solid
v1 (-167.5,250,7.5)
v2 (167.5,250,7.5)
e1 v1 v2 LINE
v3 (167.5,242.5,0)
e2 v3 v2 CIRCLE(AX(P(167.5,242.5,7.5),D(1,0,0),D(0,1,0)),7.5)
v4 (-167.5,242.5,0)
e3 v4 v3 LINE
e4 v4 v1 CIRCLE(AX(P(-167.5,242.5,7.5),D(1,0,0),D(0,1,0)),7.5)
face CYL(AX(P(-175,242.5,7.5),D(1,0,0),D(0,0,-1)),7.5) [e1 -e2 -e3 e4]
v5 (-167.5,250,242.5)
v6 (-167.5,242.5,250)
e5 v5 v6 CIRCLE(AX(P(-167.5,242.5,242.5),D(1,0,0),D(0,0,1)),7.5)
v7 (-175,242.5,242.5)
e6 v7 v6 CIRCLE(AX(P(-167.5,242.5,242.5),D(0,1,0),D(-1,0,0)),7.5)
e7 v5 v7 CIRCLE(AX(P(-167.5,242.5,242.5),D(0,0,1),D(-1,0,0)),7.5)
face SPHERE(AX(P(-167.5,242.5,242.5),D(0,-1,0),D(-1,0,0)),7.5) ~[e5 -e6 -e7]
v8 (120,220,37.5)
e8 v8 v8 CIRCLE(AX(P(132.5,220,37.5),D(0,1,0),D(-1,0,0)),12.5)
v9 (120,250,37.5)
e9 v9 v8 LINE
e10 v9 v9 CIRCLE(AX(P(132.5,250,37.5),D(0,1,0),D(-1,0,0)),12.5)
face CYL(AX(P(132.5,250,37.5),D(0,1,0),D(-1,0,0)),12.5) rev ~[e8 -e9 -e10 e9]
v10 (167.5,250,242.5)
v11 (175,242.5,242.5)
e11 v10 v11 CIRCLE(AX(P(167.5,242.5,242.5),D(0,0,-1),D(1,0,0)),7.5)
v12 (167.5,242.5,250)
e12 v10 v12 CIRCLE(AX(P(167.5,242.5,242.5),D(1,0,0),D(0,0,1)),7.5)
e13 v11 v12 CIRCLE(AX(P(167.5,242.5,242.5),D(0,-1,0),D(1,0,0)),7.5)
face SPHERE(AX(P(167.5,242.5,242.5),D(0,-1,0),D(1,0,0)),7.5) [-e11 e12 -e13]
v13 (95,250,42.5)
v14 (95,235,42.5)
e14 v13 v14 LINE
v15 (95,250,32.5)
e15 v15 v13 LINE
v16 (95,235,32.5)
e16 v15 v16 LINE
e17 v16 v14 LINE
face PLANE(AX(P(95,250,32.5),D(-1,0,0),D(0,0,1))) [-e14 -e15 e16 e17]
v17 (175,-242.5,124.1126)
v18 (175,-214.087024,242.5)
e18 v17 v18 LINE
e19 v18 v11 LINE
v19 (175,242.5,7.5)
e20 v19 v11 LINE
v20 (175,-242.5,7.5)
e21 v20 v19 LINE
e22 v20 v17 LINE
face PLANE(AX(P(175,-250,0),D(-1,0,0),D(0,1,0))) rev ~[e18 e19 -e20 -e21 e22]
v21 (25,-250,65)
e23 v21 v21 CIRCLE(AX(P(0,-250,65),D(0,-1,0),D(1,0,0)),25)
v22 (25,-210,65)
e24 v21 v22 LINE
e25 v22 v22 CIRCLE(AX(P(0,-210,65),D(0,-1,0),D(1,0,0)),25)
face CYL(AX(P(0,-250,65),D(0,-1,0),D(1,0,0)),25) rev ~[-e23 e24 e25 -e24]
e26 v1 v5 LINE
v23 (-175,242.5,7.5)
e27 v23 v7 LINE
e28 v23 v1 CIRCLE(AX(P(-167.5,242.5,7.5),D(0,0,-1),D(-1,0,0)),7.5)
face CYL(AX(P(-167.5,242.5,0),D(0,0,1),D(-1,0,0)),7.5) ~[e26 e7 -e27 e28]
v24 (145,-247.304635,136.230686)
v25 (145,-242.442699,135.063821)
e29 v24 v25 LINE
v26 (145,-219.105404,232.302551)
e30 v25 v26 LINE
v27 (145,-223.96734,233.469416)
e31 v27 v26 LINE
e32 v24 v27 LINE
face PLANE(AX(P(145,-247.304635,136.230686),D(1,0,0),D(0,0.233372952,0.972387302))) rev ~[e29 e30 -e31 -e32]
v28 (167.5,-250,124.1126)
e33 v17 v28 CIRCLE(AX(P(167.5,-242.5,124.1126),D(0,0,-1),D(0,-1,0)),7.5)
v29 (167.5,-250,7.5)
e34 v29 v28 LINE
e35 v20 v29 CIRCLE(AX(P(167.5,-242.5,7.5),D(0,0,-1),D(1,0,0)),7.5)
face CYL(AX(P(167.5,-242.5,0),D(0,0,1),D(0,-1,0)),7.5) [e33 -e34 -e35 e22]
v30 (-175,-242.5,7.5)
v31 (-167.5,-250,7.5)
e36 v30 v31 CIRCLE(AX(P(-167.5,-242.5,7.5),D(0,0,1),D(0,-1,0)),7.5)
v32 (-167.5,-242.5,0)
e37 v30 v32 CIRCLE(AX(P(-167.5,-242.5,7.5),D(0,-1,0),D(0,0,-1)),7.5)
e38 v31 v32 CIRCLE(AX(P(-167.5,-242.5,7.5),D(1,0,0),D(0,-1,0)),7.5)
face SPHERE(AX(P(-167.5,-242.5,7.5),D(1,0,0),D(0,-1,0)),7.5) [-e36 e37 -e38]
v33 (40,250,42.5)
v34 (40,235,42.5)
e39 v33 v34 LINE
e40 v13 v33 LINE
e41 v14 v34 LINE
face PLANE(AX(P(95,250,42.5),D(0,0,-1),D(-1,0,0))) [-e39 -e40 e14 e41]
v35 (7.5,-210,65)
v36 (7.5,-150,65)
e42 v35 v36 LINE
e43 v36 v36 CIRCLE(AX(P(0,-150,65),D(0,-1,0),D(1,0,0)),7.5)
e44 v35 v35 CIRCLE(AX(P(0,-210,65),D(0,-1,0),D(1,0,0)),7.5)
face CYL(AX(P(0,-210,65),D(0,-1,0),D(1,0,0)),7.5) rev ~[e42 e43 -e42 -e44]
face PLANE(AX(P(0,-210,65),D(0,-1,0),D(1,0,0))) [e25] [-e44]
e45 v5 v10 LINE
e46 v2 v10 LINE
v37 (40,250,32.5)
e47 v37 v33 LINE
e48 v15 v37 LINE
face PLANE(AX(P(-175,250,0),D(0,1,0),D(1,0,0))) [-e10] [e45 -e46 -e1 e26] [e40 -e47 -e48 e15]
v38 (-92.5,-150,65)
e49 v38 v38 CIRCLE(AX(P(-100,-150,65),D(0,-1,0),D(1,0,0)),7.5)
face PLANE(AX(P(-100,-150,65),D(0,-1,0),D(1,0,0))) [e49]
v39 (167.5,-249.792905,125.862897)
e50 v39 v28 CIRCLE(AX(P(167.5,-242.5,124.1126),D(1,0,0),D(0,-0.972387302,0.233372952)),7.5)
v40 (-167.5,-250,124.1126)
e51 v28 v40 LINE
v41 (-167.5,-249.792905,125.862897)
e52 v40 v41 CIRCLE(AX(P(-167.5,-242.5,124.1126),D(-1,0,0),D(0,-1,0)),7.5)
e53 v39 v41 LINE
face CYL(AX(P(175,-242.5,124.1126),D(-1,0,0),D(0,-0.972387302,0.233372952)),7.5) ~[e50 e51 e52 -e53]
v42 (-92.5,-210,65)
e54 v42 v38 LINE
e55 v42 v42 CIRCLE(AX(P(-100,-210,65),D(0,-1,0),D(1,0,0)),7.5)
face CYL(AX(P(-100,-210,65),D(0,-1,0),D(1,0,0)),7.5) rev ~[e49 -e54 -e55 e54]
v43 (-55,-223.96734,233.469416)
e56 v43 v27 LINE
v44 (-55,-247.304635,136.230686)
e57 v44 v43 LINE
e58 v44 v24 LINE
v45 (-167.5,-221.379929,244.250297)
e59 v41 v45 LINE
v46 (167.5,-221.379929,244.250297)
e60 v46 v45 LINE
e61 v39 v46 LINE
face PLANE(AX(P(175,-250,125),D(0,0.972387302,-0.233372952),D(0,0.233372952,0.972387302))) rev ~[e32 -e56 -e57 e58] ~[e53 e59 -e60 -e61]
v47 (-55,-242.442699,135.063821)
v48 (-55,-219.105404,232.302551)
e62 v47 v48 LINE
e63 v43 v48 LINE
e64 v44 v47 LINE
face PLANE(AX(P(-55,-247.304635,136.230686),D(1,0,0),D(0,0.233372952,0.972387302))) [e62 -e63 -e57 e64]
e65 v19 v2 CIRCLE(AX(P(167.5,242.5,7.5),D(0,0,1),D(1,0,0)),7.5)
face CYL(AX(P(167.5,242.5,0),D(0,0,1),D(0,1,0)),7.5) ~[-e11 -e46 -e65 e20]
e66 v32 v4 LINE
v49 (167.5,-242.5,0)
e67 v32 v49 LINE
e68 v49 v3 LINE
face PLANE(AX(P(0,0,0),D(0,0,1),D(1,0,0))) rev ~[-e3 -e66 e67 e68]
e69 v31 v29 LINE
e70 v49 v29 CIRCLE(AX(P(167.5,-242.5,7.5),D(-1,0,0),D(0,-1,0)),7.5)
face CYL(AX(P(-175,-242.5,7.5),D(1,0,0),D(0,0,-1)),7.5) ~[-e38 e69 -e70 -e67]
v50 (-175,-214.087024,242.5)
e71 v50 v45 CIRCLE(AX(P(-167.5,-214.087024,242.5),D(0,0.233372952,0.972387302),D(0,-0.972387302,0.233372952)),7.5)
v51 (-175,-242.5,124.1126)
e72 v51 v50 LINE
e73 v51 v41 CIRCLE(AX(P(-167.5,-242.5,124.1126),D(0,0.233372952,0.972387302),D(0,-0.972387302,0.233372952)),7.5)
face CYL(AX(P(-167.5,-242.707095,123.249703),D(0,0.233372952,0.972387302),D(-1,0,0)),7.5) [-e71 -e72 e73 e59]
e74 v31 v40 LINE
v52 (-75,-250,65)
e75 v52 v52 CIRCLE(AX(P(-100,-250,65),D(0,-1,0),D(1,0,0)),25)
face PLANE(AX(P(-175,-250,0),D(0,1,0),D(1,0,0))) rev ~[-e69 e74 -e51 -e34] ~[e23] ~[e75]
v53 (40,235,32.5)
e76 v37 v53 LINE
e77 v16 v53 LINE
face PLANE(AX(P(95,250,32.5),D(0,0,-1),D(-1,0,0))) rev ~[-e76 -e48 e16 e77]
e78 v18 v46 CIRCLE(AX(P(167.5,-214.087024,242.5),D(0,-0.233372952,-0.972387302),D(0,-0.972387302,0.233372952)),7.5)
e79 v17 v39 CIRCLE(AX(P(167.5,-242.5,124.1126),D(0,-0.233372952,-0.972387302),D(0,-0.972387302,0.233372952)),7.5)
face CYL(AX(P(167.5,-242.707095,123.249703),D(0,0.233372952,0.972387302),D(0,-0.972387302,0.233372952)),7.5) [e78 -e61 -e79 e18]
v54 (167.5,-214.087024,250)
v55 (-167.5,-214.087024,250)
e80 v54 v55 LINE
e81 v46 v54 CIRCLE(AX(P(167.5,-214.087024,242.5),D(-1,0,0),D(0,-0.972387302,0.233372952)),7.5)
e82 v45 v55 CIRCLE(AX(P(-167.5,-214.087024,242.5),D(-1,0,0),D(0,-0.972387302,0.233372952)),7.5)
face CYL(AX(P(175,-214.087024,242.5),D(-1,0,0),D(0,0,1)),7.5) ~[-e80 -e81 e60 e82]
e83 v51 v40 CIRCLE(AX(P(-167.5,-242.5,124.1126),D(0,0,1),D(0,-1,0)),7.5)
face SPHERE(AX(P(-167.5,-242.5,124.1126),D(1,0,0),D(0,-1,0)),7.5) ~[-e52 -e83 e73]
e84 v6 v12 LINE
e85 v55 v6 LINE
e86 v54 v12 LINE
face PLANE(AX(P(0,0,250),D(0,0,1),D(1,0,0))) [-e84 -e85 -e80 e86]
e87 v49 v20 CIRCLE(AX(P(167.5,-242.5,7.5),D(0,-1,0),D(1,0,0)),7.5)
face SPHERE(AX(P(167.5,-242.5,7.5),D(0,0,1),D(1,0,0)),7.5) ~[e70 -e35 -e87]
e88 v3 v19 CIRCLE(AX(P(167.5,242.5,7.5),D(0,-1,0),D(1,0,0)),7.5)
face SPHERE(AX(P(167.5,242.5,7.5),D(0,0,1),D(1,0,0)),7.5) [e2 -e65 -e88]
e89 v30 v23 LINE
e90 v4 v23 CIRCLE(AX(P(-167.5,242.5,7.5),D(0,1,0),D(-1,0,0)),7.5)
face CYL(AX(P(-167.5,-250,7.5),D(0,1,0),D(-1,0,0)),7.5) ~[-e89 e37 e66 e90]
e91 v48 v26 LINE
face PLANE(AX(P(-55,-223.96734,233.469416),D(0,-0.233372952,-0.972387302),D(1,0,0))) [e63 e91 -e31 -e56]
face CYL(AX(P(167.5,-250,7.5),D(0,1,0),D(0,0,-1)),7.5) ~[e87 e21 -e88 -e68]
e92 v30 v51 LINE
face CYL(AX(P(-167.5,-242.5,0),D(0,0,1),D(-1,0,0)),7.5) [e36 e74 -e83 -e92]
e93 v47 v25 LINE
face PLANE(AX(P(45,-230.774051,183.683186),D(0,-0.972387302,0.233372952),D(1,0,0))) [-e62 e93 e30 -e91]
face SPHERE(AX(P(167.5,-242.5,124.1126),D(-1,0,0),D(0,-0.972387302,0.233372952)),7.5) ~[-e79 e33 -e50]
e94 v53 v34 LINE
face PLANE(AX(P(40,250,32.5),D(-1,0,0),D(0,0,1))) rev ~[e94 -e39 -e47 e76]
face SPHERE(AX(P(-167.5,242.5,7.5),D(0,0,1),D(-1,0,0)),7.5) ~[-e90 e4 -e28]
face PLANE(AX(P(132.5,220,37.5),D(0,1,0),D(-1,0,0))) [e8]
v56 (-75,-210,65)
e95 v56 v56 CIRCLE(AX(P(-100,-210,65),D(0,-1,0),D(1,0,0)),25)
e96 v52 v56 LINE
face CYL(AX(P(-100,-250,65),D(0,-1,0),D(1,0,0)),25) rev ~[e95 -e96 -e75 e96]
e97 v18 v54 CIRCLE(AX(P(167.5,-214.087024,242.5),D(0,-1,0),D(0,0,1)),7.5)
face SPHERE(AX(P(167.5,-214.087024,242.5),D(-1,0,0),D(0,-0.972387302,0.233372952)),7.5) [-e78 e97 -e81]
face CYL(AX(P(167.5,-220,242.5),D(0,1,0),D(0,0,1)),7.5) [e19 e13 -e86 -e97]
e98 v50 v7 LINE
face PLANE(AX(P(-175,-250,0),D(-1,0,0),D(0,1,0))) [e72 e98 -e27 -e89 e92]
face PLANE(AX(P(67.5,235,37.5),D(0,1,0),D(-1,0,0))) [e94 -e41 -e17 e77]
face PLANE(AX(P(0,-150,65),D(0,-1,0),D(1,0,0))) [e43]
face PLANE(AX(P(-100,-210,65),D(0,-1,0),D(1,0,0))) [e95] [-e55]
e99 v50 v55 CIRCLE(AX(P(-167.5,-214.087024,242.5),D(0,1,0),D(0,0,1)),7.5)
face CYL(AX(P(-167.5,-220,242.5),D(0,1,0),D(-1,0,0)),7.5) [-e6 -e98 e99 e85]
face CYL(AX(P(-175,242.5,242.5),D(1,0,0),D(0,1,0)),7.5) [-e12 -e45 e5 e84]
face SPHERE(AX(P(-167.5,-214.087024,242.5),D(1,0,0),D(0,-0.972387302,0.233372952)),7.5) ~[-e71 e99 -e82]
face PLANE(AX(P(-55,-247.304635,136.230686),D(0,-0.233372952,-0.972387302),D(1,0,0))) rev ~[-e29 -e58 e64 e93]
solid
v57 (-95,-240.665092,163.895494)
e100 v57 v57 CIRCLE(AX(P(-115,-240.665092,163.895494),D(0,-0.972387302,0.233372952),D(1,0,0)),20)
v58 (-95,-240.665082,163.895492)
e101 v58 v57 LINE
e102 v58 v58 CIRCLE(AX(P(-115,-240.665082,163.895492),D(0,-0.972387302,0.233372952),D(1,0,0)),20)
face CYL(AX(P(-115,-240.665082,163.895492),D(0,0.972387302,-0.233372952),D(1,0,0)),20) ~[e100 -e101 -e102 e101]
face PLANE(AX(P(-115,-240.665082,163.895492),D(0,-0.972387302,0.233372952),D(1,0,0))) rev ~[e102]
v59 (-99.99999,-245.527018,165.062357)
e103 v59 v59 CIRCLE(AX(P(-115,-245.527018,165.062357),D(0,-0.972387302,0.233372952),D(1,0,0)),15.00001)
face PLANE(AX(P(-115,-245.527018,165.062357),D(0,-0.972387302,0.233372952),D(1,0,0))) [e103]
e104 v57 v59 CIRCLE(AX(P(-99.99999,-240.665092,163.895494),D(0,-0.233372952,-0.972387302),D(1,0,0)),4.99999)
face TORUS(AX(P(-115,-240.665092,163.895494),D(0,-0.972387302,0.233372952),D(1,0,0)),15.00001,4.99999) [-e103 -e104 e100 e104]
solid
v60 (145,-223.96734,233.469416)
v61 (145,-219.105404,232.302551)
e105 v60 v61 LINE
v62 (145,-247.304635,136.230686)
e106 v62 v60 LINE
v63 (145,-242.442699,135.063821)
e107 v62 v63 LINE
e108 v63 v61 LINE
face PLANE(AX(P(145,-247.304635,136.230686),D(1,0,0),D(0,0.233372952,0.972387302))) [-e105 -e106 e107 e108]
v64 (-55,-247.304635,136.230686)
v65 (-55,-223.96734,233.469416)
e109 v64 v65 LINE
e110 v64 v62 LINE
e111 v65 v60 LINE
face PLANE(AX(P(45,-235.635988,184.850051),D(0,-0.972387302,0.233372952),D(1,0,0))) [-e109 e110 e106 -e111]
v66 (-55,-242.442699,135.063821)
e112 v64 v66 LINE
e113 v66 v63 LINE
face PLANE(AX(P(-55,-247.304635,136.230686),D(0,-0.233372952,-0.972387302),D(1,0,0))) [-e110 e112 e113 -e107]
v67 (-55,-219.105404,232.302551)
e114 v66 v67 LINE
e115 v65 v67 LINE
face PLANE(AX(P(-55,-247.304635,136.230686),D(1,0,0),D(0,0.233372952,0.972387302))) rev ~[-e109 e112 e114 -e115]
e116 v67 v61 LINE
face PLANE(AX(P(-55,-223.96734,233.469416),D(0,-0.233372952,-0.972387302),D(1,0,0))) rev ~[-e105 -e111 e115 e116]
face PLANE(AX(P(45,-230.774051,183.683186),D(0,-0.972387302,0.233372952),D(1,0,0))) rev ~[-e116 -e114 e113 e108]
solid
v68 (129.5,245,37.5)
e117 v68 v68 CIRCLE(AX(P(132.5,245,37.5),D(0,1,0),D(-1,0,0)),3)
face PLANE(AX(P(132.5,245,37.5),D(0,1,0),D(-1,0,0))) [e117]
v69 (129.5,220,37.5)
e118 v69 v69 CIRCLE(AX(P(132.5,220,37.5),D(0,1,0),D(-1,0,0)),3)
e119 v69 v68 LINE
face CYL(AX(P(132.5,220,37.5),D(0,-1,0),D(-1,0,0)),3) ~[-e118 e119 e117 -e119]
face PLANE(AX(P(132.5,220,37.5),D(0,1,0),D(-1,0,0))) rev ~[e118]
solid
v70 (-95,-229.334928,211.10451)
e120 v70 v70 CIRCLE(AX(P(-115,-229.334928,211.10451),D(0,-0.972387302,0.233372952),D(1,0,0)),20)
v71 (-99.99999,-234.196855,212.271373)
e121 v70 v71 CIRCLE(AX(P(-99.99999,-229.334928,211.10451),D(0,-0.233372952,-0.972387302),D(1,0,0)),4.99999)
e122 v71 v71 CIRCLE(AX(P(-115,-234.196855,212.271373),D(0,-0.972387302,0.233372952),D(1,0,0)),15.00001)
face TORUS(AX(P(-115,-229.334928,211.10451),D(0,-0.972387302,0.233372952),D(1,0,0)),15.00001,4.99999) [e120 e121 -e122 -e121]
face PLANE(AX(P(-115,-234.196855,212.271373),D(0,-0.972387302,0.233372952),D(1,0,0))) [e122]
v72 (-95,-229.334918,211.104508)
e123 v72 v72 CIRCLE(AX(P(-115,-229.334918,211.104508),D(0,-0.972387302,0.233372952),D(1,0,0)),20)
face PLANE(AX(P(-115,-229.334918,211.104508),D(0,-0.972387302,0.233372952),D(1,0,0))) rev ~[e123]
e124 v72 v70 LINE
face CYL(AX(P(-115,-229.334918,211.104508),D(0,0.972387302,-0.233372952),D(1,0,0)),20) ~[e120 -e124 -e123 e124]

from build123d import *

# Parameters (mm, degrees)
F0_W      = 350
F0_H      = 500
F1_DEPTH  = 250
F3_DEPTH  = 350
F4_R      = 20
F5_DEPTH  = 5
F6_R      = 4.99999
F7_R      = 20
F8_DEPTH  = 5
F9_R      = 4.99999
F10_W     = 200
F10_H     = 100
F11_DEPTH = 5
F12_W     = 200
F12_H     = 100
F13_DEPTH = 5
F14_R     = 25
F15_DEPTH = 40
F16_R     = 7.5
F17_DEPTH = 60
F18_R     = 25
F19_DEPTH = 40
F20_R     = 7.5
F21_DEPTH = 60
F22_R     = 7.5
F23_R     = 12.5
F24_DEPTH = 30
F25_R     = 3
F26_DEPTH = 25
F27_W     = 55
F27_H     = 10
F28_DEPTH = 15


# Not quite as in the source:
# - a fillet or chamfer is up to 0.001 mm smaller than in the source, because OpenCascade refuses the exact size


with BuildPart() as f1:
    # F0 (on Top) → F1 (new body)
    with BuildSketch(Plane.XY):
        Rectangle(F0_W, F0_H)
    extrude(amount=F1_DEPTH)

    # F2 (on face) → F3 (cut)
    with BuildSketch(Plane.YZ.offset(175)):
        Polygon((-220, 250), (-250, 250), (-250, 125), align=None)
    extrude(amount=-F3_DEPTH, mode=Mode.SUBTRACT)

    # F10 (on face) → F11 (cut)
    with BuildSketch(Plane(origin=(0, -264.7503782148, 63.5400907716), x_dir=(1, 0, 0), z_dir=(0, -0.972387302, 0.2333729525))):
        with Locations((45, 124.7547759506)):
            Rectangle(F10_W, F10_H)
    extrude(amount=-F11_DEPTH, mode=Mode.SUBTRACT)

    # F14 (on face) → F15 (cut)
    with BuildSketch(Plane.XZ.offset(250)):
        with Locations((0, 65)):
            Circle(F14_R)
    extrude(amount=-F15_DEPTH, mode=Mode.SUBTRACT)

    # F16 (on face) → F17 (cut)
    with BuildSketch(Plane.XZ.offset(210)):
        with Locations((0, 65)):
            Circle(F16_R)
    extrude(amount=-F17_DEPTH, mode=Mode.SUBTRACT)

    # F18 (on face) → F19 (cut)
    with BuildSketch(Plane.XZ.offset(250)):
        with Locations((-100, 65)):
            Circle(F18_R)
    extrude(amount=-F19_DEPTH, mode=Mode.SUBTRACT)

    # F20 (on face) → F21 (cut)
    with BuildSketch(Plane.XZ.offset(210)):
        with Locations((-100, 65)):
            Circle(F20_R)
    extrude(amount=-F21_DEPTH, mode=Mode.SUBTRACT)

    # F22
    f22_edges = [f1.edges().sort_by_distance(p)[0] for p in [
        (175, -235, 187.5),
        (175, -250, 62.5),
        (0, -250, 125),
        (175, 15, 250),
        (175, 250, 125),
        (175, 0, 0),
        (0, -250, 0),
        (-175, -250, 62.5),
        (-175, -235, 187.5),
        (-175, 15, 250),
        (-175, 250, 125),
        (-175, 0, 0),
        (0, 250, 0),
        (0, 250, 250),
        (0, -220, 250),
    ]]
    fillet(f22_edges, radius=F22_R)

    # F23 (on face) → F24 (cut)
    with BuildSketch(Plane(origin=(0, 250, 0), x_dir=(-1, 0, 0), z_dir=(0, 1, 0))):
        with Locations((-132.5, 37.5)):
            Circle(F23_R)
    extrude(amount=-F24_DEPTH, mode=Mode.SUBTRACT)

    # F27 (on face) → F28 (cut)
    with BuildSketch(Plane(origin=(0, 250, 0), x_dir=(-1, 0, 0), z_dir=(0, 1, 0))):
        with Locations((-67.5, 37.5)):
            Rectangle(F27_W, F27_H)
    extrude(amount=-F28_DEPTH, mode=Mode.SUBTRACT)


with BuildPart() as f5:
    # F4 (on face) → F5 (new body)
    with BuildSketch(Plane(origin=(0, -264.7503782148, 63.5400907716), x_dir=(1, 0, 0), z_dir=(0, -0.972387302, 0.2333729525))):
        with Locations((-115, 151.7547759506)):
            Circle(F4_R)
    extrude(amount=F5_DEPTH)

    # F6 (radius 5 in the source; OpenCascade refuses exactly that, so slightly less here)
    f6_edges = [f5.edges().sort_by_distance(p)[0] for p in [
        (-135, -234.196855, 212.271373),
    ]]
    fillet(f6_edges, radius=F6_R)


with BuildPart() as f8:
    # F7 (on face) → F8 (new body)
    with BuildSketch(Plane(origin=(0, -264.7503782148, 63.5400907716), x_dir=(1, 0, 0), z_dir=(0, -0.972387302, 0.2333729525))):
        with Locations((-115, 103.2051746287)):
            Circle(F7_R)
    extrude(amount=F8_DEPTH)

    # F9 (radius 5 in the source; OpenCascade refuses exactly that, so slightly less here)
    f9_edges = [f8.edges().sort_by_distance(p)[0] for p in [
        (-135, -245.527018, 165.062357),
    ]]
    fillet(f9_edges, radius=F9_R)


with BuildPart() as f13:
    # F12 (on face) → F13 (new body)
    with BuildSketch(Plane(origin=(0, -264.7503782148, 63.5400907716), x_dir=(1, 0, 0), z_dir=(0, -0.972387302, 0.2333729525))):
        with Locations((45, 124.7547759506)):
            Rectangle(F12_W, F12_H)
    extrude(amount=-F13_DEPTH)


with BuildPart() as f26:
    # F25 (on face) → F26 (new body)
    with BuildSketch(Plane(origin=(0, 220, 0), x_dir=(-1, 0, 0), z_dir=(0, 1, 0))):
        with Locations((-132.5, 37.5)):
            Circle(F25_R)
    extrude(amount=F26_DEPTH)


solid = Compound([f1.part, f5.part, f8.part, f13.part, f26.part])
